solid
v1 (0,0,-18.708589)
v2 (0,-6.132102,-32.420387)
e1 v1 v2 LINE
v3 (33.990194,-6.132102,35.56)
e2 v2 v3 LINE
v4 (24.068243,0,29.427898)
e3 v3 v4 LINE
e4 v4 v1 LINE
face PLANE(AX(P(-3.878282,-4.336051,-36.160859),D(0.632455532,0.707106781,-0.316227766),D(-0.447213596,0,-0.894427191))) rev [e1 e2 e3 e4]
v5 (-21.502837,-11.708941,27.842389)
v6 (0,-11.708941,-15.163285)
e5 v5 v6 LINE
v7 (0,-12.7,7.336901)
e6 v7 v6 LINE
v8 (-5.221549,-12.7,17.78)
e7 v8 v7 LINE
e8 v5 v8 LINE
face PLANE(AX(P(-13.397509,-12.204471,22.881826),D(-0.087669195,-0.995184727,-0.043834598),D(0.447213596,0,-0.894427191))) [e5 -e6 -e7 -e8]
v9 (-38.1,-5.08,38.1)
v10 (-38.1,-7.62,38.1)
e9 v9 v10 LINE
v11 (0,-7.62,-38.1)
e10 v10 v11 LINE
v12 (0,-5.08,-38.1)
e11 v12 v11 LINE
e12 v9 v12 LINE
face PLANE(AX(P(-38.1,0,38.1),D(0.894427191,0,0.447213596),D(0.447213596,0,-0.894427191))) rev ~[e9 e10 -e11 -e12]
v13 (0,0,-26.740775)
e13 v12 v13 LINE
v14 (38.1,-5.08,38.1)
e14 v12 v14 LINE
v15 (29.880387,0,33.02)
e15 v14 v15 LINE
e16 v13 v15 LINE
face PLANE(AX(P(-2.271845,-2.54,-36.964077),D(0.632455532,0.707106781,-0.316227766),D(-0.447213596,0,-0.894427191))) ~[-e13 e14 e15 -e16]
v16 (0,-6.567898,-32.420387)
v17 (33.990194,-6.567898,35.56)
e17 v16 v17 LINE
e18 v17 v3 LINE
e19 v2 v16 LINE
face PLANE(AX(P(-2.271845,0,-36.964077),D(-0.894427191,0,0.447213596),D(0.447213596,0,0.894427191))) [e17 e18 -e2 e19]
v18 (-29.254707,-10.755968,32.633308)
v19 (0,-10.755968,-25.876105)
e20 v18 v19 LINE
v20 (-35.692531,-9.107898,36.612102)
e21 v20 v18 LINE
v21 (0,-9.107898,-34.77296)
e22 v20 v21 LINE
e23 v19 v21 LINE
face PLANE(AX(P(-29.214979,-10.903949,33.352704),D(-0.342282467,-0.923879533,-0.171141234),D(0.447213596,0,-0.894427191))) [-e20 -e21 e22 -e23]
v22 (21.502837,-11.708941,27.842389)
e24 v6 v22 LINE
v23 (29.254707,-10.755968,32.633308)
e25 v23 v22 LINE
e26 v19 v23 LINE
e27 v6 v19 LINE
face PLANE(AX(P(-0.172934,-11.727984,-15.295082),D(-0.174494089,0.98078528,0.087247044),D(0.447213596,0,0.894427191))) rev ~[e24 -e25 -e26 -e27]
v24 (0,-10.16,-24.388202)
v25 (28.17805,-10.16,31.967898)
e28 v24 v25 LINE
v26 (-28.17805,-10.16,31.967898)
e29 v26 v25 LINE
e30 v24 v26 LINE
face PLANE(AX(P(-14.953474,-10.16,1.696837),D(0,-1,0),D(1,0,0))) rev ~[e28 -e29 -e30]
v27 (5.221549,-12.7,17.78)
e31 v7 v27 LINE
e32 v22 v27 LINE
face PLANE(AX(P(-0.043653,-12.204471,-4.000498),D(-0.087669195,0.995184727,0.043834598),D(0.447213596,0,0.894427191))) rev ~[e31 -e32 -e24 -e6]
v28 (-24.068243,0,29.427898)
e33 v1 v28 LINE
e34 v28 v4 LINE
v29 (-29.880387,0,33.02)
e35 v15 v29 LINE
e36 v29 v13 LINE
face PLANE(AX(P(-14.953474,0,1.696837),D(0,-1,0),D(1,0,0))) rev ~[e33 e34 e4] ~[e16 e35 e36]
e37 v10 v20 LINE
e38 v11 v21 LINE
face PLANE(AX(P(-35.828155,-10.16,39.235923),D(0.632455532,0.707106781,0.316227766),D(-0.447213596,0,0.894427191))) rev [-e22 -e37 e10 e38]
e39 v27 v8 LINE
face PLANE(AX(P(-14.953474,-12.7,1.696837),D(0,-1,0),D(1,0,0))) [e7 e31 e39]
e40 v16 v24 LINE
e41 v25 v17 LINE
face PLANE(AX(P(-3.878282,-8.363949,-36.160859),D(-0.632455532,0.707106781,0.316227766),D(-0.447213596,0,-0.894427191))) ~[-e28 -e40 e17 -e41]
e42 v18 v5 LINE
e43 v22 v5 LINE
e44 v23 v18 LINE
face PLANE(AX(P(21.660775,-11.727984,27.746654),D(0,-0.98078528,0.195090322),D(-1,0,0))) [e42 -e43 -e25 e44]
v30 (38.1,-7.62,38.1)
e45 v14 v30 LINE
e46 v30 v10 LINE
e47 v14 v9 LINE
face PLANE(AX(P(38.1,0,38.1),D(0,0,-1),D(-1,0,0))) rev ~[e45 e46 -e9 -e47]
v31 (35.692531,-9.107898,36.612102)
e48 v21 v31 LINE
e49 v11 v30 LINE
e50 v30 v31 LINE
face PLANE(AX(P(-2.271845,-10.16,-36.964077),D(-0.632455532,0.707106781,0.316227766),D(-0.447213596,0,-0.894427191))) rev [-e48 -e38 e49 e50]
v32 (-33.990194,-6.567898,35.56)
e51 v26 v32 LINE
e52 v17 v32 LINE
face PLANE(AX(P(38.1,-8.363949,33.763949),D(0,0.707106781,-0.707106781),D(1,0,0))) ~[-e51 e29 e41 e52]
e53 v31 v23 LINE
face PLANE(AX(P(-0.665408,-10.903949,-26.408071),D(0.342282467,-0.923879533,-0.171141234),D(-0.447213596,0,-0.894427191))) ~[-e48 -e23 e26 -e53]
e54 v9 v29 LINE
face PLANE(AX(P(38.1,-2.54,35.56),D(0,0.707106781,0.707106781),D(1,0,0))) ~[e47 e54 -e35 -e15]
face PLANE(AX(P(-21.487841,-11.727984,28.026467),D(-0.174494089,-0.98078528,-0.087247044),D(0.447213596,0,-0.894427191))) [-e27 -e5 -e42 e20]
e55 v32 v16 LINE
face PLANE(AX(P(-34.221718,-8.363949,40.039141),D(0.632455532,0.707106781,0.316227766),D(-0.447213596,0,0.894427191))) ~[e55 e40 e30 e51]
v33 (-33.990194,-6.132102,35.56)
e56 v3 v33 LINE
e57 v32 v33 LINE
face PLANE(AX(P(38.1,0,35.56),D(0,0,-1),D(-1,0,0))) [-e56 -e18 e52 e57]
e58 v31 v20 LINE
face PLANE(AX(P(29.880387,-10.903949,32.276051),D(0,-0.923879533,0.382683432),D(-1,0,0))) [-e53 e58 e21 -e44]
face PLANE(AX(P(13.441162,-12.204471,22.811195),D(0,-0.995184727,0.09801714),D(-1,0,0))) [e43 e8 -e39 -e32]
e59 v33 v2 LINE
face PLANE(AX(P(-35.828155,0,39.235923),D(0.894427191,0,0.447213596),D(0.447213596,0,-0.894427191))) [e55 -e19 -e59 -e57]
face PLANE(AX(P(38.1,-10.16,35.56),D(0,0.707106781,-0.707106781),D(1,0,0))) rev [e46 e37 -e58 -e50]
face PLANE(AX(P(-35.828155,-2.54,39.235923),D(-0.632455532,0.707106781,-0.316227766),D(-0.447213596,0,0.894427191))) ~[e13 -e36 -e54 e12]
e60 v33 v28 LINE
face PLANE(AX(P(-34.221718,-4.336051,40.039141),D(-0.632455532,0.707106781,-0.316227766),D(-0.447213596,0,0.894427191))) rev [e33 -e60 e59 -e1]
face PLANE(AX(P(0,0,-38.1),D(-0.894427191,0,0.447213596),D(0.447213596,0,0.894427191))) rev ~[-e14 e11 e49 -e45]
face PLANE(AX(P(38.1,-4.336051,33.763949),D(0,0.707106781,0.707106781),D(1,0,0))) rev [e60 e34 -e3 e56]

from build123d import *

# Parameters (mm, degrees)
F1_DEPTH = 12.7
F2_SIZE  = 5.08
F3_T     = -2.54
F4_SIZE  = 5.08
F5_SIZE  = 5.08
F6_SIZE  = 5.08


# Not quite as in the source:
# - a feature of the source that left no trace in its solid (it failed there, or was rolled back) is left out


with BuildPart() as f1:
    # F0 (on Front) → F1 (new body)
    with BuildSketch(Plane.XZ):
        Polygon((0, 0), (-38.1, 38.1), (0, -38.1), align=None)
        Polygon((38.1, 38.1), (-38.1, 38.1), (0, 0), align=None)
        Polygon((0, 0), (0, -38.1), (38.1, 38.1), align=None)
    extrude(amount=F1_DEPTH)

    # F2
    f2_edges = [f1.edges().sort_by_distance(p)[0] for p in [
        (0, -12.7, 38.1),
        (-19.05, -12.7, 0),
        (19.05, -12.7, 0),
        (-19.05, 0, 0),
        (0, 0, 38.1),
        (19.05, 0, 0),
    ]]
    chamfer(f2_edges, length=F2_SIZE)

    # F3
    f3_openings = [f1.faces().sort_by_distance(p)[0] for p in [
        (0, 0, 13.099742),
    ]]
    offset(amount=F3_T, openings=f3_openings, kind=Kind.INTERSECTION)

    # F4
    f4_edges = [f1.edges().sort_by_distance(p)[0] for p in [
        (0, -12.7, 33.02),
        (14.940194, -12.7, 3.139613),
        (-14.940194, -12.7, 3.139613),
    ]]
    chamfer(f4_edges, length=F4_SIZE)

    # F5
    f5_edges = [f1.edges().sort_by_distance(p)[0] for p in [
        (0, -12.7, 27.94),
        (10.830387, -12.7, 6.279225),
        (-10.830387, -12.7, 6.279225),
    ]]
    chamfer(f5_edges, length=F5_SIZE)

    # F6
    f6_edges = [f1.edges().sort_by_distance(p)[0] for p in [
        (0, -12.7, 22.86),
        (6.720581, -12.7, 9.418838),
        (-6.720581, -12.7, 9.418838),
    ]]
    chamfer(f6_edges, length=F6_SIZE)


solid = f1.part
